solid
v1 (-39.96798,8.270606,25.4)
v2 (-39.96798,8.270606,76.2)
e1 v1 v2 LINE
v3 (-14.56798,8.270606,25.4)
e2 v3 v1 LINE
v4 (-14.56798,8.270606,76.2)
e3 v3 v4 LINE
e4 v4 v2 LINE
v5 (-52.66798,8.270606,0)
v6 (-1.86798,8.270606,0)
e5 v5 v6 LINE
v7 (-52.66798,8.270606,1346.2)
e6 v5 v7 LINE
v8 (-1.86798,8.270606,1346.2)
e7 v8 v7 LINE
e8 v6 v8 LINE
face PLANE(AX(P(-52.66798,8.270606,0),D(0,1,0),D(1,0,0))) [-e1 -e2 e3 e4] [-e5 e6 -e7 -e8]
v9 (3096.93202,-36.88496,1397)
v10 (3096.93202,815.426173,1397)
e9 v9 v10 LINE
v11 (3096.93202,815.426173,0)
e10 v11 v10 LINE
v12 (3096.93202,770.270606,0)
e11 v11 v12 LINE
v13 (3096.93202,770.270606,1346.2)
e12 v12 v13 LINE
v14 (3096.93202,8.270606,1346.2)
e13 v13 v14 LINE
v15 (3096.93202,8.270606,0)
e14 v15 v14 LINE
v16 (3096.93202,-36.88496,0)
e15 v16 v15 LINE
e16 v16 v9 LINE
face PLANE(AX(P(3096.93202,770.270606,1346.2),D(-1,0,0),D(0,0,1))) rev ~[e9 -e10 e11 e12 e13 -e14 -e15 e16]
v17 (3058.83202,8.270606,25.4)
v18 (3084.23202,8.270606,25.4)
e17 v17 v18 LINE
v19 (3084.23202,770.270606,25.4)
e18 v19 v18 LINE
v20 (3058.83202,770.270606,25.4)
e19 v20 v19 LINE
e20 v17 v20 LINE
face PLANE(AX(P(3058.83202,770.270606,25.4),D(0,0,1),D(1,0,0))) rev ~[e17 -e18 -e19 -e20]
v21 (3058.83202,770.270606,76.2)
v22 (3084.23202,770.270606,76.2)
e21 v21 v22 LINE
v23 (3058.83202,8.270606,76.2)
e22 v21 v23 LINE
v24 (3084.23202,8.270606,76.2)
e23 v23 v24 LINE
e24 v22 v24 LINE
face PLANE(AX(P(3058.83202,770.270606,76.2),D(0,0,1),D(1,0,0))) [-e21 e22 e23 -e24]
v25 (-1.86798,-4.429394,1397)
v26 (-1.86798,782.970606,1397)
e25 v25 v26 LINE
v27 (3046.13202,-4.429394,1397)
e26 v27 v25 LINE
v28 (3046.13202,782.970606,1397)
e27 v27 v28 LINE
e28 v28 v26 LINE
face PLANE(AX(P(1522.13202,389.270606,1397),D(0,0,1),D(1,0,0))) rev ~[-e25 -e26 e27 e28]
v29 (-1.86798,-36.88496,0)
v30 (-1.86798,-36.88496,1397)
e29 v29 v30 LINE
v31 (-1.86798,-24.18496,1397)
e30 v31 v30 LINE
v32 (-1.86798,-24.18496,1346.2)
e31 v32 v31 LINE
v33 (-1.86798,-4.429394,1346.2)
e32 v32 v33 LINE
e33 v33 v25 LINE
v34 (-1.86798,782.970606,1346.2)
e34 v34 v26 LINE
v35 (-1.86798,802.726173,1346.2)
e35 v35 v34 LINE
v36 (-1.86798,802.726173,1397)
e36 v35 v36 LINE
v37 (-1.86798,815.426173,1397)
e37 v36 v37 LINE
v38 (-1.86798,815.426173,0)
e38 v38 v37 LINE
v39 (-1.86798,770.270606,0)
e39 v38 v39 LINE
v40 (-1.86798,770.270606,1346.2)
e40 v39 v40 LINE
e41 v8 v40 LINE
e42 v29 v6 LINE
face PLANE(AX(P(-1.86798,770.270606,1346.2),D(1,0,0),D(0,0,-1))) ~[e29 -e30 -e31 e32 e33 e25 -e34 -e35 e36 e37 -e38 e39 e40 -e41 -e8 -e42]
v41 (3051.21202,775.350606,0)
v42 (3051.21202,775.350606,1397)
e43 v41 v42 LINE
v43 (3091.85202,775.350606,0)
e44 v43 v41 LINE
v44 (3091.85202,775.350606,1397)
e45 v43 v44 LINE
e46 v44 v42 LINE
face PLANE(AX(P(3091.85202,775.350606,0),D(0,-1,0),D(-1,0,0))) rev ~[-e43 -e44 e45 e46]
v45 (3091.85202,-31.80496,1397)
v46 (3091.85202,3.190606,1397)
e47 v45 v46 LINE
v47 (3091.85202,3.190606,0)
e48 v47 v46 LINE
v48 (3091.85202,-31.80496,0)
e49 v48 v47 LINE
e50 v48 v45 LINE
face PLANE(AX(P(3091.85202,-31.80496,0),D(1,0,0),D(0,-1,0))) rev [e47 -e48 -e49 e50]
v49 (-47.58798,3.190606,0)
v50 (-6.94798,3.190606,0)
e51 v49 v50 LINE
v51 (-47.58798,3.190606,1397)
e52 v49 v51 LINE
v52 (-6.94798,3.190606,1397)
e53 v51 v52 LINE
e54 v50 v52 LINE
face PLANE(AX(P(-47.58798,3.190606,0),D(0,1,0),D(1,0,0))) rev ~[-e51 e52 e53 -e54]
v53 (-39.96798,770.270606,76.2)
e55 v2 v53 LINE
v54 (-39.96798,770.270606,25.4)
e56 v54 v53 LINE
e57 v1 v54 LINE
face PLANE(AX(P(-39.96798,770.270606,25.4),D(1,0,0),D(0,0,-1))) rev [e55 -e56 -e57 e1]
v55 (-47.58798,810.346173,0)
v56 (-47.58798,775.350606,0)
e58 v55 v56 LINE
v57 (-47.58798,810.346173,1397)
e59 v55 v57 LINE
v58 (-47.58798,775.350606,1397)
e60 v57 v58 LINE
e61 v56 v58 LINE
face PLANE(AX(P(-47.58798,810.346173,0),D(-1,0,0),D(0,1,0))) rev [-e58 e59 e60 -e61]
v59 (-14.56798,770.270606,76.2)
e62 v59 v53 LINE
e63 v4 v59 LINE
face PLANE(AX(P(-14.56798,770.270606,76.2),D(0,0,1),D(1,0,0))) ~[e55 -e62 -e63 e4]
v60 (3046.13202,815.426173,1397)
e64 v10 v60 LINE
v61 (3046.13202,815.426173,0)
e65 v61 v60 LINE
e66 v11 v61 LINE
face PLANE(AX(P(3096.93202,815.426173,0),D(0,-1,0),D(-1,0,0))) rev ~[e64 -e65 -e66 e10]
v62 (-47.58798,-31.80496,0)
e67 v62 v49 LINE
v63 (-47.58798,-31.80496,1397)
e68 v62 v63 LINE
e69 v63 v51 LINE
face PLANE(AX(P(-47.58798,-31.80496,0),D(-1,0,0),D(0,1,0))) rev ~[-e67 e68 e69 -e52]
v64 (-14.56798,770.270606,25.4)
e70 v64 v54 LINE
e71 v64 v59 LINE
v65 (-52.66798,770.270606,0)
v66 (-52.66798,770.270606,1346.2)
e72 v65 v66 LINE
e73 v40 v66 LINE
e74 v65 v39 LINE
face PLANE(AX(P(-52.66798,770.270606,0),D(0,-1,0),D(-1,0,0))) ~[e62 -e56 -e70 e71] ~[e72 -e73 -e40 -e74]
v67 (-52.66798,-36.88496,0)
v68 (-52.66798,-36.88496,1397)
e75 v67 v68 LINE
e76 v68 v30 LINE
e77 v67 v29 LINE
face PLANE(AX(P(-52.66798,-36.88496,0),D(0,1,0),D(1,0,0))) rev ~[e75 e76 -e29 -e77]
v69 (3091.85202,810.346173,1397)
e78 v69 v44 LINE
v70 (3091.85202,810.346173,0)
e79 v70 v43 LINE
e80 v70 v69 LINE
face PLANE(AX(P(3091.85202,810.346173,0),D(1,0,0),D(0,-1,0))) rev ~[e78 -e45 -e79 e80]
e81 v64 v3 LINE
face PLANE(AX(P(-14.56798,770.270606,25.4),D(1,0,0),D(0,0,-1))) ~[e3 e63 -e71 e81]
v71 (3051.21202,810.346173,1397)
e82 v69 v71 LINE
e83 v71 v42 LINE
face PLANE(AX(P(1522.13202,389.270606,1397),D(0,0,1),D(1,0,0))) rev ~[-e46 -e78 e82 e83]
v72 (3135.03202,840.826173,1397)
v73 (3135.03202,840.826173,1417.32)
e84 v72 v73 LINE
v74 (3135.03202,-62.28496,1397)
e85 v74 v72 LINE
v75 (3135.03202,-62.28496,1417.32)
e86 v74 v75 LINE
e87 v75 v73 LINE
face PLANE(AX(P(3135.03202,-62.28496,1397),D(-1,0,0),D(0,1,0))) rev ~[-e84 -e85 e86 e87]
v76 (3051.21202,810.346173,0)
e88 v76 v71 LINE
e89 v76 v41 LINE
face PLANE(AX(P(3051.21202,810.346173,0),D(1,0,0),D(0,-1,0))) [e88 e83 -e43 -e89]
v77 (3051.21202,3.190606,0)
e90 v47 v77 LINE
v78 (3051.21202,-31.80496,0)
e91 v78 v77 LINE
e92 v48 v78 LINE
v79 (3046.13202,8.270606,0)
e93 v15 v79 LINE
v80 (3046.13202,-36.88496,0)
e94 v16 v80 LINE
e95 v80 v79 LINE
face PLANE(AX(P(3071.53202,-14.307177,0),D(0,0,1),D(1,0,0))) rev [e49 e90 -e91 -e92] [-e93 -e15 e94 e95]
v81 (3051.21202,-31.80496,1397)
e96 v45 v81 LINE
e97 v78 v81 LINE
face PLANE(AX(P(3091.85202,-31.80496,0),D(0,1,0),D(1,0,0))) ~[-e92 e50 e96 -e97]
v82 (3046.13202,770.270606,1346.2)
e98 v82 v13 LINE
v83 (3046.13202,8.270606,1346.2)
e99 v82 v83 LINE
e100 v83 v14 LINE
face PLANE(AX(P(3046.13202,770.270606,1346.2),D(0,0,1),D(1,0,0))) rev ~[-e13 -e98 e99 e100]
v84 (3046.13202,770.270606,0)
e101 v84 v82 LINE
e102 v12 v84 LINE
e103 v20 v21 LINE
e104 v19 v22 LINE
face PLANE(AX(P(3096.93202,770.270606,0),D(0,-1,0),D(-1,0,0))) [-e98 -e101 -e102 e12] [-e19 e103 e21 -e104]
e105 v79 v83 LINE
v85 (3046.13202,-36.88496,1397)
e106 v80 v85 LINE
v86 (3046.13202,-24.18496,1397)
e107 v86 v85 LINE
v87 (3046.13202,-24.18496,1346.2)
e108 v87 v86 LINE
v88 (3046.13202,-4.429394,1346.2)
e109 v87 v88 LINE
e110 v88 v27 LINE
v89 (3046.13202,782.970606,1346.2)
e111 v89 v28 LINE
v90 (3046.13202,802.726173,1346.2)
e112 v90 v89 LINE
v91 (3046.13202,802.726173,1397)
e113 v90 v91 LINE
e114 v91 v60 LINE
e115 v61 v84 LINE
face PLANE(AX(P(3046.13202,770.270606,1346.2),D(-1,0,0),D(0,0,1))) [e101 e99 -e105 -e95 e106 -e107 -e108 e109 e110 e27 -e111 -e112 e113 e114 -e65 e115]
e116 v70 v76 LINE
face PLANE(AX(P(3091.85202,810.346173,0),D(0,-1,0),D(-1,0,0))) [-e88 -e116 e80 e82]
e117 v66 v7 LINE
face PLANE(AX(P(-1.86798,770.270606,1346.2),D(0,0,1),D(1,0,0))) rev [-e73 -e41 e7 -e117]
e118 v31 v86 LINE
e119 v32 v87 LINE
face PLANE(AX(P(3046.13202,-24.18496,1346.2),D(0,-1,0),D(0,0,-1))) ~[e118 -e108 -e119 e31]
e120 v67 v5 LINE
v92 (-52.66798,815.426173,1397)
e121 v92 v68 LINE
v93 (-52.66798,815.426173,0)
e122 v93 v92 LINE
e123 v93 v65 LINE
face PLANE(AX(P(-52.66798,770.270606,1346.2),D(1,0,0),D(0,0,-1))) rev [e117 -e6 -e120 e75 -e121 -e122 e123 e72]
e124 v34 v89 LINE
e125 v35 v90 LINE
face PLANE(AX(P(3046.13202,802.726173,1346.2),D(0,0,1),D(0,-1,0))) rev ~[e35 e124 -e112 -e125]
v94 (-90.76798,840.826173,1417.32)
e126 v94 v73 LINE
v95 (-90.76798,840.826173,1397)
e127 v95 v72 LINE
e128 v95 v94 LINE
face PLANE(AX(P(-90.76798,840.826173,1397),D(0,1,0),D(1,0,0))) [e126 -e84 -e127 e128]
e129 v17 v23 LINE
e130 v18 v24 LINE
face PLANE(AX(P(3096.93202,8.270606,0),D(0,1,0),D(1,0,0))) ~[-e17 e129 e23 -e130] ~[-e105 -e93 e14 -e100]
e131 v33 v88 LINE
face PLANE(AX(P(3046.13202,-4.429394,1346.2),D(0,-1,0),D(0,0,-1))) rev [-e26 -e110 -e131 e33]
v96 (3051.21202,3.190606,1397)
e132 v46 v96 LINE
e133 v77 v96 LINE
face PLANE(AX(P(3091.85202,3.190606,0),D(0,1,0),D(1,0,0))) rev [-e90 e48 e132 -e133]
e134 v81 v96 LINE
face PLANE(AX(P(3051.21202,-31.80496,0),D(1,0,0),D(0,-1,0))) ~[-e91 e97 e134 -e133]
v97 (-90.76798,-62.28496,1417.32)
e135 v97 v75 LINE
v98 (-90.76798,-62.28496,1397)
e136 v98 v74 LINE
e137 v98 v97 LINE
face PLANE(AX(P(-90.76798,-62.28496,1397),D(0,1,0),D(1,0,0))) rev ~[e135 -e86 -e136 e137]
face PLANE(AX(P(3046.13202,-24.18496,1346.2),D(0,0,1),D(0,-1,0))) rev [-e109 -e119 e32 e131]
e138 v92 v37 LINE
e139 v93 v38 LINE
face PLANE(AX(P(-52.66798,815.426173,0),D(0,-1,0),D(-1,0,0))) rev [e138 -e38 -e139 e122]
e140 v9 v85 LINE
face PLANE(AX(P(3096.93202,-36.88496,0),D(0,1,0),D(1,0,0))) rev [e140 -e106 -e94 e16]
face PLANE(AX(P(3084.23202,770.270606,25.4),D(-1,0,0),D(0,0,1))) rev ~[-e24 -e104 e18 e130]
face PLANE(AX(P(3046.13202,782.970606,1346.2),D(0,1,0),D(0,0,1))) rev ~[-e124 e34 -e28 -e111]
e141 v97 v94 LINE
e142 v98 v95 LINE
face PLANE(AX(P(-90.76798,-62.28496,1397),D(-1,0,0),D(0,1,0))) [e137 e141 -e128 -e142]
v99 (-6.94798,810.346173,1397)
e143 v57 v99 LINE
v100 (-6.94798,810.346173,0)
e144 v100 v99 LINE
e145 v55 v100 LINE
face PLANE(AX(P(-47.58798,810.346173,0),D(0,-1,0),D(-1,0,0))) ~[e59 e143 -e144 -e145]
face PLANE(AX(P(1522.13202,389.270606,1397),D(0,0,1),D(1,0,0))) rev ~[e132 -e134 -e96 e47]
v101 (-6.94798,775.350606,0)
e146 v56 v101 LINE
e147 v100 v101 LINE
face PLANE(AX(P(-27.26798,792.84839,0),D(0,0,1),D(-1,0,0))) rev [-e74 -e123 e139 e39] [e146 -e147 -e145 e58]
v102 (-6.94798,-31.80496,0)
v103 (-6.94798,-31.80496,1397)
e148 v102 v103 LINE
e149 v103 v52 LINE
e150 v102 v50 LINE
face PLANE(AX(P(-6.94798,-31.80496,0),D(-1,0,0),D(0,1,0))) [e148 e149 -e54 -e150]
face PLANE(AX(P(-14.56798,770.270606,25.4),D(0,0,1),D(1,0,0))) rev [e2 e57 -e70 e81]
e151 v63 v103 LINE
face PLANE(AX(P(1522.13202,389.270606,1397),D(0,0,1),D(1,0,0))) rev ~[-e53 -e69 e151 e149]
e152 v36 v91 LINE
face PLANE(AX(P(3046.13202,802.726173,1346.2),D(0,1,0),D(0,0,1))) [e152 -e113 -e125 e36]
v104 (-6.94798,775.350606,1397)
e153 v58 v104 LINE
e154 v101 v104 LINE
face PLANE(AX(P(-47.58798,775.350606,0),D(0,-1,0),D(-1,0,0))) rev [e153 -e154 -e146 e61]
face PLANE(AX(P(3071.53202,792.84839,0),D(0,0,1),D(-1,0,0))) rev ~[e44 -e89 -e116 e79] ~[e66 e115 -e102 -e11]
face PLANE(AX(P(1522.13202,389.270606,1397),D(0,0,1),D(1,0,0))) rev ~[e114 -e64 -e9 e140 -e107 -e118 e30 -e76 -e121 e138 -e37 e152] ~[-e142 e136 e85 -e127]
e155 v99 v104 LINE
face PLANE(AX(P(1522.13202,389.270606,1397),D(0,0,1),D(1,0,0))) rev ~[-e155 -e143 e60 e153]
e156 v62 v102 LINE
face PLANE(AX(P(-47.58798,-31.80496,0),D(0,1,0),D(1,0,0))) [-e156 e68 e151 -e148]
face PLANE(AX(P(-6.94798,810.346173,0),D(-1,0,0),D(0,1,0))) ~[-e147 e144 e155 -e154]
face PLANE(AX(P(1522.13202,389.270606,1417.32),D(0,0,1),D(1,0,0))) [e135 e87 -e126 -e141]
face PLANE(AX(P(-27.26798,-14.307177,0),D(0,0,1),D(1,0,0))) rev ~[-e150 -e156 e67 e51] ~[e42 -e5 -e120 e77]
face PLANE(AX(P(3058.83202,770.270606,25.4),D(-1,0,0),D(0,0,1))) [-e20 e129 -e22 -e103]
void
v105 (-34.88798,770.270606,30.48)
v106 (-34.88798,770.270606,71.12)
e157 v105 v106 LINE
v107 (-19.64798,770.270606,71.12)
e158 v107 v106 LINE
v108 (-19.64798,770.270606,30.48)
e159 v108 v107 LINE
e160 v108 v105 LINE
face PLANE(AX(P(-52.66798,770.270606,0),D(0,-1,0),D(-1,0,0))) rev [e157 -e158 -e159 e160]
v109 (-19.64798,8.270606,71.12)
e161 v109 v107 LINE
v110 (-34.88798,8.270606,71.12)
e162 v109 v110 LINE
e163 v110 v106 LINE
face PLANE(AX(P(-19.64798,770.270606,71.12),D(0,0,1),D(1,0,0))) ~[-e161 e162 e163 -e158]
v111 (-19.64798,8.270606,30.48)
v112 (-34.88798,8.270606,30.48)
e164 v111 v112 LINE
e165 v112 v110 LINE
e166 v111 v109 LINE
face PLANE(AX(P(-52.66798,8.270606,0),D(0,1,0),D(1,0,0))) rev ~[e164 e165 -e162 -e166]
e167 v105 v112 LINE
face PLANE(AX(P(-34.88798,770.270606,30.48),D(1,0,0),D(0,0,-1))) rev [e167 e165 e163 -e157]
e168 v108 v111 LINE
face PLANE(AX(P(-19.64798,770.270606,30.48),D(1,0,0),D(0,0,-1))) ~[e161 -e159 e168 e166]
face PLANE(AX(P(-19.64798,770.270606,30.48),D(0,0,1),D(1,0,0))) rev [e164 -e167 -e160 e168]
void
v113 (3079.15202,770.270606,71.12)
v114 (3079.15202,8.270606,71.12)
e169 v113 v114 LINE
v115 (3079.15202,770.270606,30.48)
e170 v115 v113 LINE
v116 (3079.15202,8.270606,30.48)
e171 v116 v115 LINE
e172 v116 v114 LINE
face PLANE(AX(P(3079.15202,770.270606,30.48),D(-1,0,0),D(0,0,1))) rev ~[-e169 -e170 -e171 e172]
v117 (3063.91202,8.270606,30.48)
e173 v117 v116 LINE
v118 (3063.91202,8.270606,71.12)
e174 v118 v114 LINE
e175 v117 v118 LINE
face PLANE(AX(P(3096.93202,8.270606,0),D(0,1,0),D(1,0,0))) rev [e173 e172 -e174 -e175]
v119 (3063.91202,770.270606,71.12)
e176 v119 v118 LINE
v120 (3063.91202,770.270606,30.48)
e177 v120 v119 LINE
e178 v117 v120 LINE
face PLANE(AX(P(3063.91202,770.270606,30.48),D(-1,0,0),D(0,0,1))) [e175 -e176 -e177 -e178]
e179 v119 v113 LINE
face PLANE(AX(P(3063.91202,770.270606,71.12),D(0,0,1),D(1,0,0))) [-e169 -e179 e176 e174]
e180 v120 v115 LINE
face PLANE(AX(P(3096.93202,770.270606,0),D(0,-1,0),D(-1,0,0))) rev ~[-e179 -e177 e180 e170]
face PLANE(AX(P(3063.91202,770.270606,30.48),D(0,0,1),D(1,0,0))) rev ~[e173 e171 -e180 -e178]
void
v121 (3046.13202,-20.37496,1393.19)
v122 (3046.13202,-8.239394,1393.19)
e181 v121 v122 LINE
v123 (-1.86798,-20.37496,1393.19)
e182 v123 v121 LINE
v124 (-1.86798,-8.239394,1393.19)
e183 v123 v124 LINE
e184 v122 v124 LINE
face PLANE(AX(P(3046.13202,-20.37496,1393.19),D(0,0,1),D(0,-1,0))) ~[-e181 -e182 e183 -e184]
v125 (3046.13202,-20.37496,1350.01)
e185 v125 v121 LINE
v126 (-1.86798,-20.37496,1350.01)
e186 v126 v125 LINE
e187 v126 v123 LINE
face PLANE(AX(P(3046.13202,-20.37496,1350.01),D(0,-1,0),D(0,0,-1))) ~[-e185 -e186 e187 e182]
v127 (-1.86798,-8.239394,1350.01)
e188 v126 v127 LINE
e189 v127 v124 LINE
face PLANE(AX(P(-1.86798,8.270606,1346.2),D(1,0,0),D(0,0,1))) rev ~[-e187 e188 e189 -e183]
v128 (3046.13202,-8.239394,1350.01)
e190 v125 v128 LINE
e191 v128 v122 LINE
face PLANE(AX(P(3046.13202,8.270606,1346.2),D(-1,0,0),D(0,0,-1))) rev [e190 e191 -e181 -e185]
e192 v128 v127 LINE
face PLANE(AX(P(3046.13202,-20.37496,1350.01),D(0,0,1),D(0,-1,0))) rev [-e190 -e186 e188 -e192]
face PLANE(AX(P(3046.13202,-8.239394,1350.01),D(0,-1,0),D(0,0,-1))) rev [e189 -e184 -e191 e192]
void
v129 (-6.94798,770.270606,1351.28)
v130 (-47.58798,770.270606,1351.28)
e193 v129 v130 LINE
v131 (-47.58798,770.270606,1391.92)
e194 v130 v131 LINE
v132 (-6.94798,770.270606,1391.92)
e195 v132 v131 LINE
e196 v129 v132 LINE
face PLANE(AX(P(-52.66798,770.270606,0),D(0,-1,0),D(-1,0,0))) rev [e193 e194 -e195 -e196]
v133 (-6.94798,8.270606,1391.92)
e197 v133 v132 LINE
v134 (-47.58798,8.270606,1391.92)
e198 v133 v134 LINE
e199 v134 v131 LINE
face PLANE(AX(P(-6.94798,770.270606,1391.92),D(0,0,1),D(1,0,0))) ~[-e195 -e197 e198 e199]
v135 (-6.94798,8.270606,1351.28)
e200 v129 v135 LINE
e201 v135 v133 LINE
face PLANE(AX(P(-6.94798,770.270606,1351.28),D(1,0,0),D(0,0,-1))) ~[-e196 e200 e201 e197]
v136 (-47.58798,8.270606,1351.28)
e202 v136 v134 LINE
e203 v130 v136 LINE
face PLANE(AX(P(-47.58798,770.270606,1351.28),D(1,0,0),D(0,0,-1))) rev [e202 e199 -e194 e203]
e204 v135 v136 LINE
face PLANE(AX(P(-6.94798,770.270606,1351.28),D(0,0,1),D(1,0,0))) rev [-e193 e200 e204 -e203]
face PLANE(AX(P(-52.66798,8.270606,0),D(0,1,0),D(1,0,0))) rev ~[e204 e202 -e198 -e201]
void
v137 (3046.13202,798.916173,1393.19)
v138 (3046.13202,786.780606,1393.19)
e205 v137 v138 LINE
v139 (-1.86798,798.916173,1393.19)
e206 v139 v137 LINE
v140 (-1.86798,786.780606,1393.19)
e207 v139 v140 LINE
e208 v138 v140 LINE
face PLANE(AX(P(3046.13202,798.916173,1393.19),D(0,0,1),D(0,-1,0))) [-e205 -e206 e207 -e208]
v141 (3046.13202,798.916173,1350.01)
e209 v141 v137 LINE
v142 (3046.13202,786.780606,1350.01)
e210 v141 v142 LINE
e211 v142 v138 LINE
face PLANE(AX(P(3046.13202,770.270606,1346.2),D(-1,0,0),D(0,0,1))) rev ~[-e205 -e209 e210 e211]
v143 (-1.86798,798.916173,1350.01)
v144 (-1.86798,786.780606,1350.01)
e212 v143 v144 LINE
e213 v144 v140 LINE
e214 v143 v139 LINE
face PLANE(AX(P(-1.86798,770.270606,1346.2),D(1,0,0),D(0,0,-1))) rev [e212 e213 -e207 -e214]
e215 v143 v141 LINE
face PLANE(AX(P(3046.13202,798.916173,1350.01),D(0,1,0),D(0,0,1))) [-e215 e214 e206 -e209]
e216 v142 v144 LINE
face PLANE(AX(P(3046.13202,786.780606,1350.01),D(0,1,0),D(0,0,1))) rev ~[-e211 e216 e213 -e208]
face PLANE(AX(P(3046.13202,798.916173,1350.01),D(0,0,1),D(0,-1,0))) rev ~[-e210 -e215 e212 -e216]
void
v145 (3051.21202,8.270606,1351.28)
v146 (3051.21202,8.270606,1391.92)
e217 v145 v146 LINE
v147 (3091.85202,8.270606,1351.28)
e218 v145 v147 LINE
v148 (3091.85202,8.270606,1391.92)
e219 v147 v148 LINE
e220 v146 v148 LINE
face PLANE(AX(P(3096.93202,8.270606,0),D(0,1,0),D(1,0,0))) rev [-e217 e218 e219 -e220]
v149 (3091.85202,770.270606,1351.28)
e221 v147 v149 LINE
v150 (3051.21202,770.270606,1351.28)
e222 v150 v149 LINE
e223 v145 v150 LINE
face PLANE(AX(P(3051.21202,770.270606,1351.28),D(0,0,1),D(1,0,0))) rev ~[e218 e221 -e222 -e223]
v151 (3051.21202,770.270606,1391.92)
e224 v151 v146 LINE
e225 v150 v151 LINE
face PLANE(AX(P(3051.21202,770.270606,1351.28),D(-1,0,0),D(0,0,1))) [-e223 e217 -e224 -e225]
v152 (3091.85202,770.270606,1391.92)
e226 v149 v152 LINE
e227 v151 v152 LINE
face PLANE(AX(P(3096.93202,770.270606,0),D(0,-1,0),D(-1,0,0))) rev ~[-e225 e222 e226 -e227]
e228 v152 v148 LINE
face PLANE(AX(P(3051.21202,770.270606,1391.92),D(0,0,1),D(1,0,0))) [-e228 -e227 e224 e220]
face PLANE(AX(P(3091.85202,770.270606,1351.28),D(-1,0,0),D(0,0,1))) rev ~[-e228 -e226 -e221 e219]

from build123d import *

# Parameters (mm, degrees)
F0_W     = 50.8
F0_H     = 45.1555665885
F0_W_2   = 40.64
F0_H_2   = 34.9955665885
F1_DEPTH = 1397
F2_W     = 25.4
F2_H     = 50.8
F2_W_2   = 15.24
F2_H_2   = 40.64
F2_W_3   = 50.8
F2_W_4   = 40.64
F3_DEPTH = 381
F4_W     = 19.7555665885
F4_H     = 50.8
F4_W_2   = 12.1355665885
F4_H_2   = 43.18
F5_DEPTH = 1524
F8_W     = 3225.8
F8_H     = 903.1111331769
F8_W_2   = 40.64
F8_H_2   = 34.9955665885
F8_W_3   = 3048
F8_H_3   = 787.4
F9_DEPTH = 20.32


with BuildPart() as f1:
    # F0 (on Top) → F1 (new body)
    with BuildSketch(Plane.XY):
        with Locations((-27.2679795849, -14.3071769268)):
            Rectangle(F0_W, F0_H)
        with Locations((-27.2679795849, -14.3071769268)):
            Rectangle(F0_W_2, F0_H_2, mode=Mode.SUBTRACT)
    extrude(amount=F1_DEPTH)

    # F2 (on face) → F3 (join)
    with BuildSketch(Plane(origin=(0, 8.2706063674, 0), x_dir=(-1, 0, 0), z_dir=(0, 1, 0))):
        with Locations((27.2679795849, 50.8)):
            Rectangle(F2_W, F2_H)
        with Locations((27.2679795849, 50.8)):
            Rectangle(F2_W_2, F2_H_2, mode=Mode.SUBTRACT)
        with Locations((27.2679795849, 1371.6)):
            Rectangle(F2_W_3, F2_H)
        with Locations((27.2679795849, 1371.6)):
            Rectangle(F2_W_4, F2_H_2, mode=Mode.SUBTRACT)
    extrude(amount=F3_DEPTH)

    # F4 (on face) → F5 (join)
    with BuildSketch(Plane.YZ.offset(-1.8679795849)):
        with Locations((-14.3071769268, 1371.6)):
            Rectangle(F4_W, F4_H)
        with Locations((-14.3071769268, 1371.6)):
            Rectangle(F4_W_2, F4_H_2, mode=Mode.SUBTRACT)
    extrude(amount=F5_DEPTH)

    # F6: F1 across face


with BuildPart() as f1_1:
    add(f1.part)
    add(f1.part.mirror(Plane(origin=(1522.1320204151, -14.3071769268, 1371.6), x_dir=(0, 1, 0), z_dir=(1, 0, 0))))

    # F7: F1 across face


with BuildPart() as f1_2:
    add(f1_1.part)
    add(f1_1.part.mirror(Plane(origin=(-27.2679795849, 389.2706063674, 1371.6), x_dir=(-1, 0, 0), z_dir=(0, 1, 0))))

    # F8 (on face) → F9 (join)
    with BuildSketch(Plane.XY.offset(1397)):
        with Locations((1522.1320204151, 389.2706063674)):
            Rectangle(F8_W, F8_H)
        Polygon((-52.6679795849, -36.8849602211), (-52.6679795849, 815.4261729559), (-1.8679795849, 815.4261729559), (-1.8679795849, 802.7261729559), (3046.1320204151, 802.7261729559), (3046.1320204151, 815.4261729559), (3096.9320204151, 815.4261729559), (3096.9320204151, -36.8849602211), (3046.1320204151, -36.8849602211), (3046.1320204151, -24.1849602211), (-1.8679795849, -24.1849602211), (-1.8679795849, -36.8849602211), align=None, mode=Mode.SUBTRACT)
        Polygon((-1.8679795849, 815.4261729559), (-52.6679795849, 815.4261729559), (-52.6679795849, -36.8849602211), (-1.8679795849, -36.8849602211), (-1.8679795849, -24.1849602211), (3046.1320204151, -24.1849602211), (3046.1320204151, -36.8849602211), (3096.9320204151, -36.8849602211), (3096.9320204151, 815.4261729559), (3046.1320204151, 815.4261729559), (3046.1320204151, 802.7261729559), (-1.8679795849, 802.7261729559), align=None)
        with Locations((-27.2679795849, -14.3071769268)):
            Rectangle(F8_W_2, F8_H_2, mode=Mode.SUBTRACT)
        with Locations((3071.5320204151, -14.3071769268)):
            Rectangle(F8_W_2, F8_H_2, mode=Mode.SUBTRACT)
        with Locations((1522.1320204151, 389.2706063674)):
            Rectangle(F8_W_3, F8_H_3, mode=Mode.SUBTRACT)
        with Locations((-27.2679795849, 792.8483896616)):
            Rectangle(F8_W_2, F8_H_2, mode=Mode.SUBTRACT)
        with Locations((3071.5320204151, 792.8483896616)):
            Rectangle(F8_W_2, F8_H_2, mode=Mode.SUBTRACT)
        with Locations((1522.1320204151, 389.2706063674)):
            Rectangle(F8_W_3, F8_H_3)
        with Locations((-27.2679795849, -14.3071769268)):
            Rectangle(F8_W_2, F8_H_2)
        with Locations((3071.5320204151, -14.3071769268)):
            Rectangle(F8_W_2, F8_H_2)
        with Locations((3071.5320204151, 792.8483896616)):
            Rectangle(F8_W_2, F8_H_2)
        with Locations((-27.2679795849, 792.8483896616)):
            Rectangle(F8_W_2, F8_H_2)
    extrude(amount=F9_DEPTH)


solid = f1_2.part
